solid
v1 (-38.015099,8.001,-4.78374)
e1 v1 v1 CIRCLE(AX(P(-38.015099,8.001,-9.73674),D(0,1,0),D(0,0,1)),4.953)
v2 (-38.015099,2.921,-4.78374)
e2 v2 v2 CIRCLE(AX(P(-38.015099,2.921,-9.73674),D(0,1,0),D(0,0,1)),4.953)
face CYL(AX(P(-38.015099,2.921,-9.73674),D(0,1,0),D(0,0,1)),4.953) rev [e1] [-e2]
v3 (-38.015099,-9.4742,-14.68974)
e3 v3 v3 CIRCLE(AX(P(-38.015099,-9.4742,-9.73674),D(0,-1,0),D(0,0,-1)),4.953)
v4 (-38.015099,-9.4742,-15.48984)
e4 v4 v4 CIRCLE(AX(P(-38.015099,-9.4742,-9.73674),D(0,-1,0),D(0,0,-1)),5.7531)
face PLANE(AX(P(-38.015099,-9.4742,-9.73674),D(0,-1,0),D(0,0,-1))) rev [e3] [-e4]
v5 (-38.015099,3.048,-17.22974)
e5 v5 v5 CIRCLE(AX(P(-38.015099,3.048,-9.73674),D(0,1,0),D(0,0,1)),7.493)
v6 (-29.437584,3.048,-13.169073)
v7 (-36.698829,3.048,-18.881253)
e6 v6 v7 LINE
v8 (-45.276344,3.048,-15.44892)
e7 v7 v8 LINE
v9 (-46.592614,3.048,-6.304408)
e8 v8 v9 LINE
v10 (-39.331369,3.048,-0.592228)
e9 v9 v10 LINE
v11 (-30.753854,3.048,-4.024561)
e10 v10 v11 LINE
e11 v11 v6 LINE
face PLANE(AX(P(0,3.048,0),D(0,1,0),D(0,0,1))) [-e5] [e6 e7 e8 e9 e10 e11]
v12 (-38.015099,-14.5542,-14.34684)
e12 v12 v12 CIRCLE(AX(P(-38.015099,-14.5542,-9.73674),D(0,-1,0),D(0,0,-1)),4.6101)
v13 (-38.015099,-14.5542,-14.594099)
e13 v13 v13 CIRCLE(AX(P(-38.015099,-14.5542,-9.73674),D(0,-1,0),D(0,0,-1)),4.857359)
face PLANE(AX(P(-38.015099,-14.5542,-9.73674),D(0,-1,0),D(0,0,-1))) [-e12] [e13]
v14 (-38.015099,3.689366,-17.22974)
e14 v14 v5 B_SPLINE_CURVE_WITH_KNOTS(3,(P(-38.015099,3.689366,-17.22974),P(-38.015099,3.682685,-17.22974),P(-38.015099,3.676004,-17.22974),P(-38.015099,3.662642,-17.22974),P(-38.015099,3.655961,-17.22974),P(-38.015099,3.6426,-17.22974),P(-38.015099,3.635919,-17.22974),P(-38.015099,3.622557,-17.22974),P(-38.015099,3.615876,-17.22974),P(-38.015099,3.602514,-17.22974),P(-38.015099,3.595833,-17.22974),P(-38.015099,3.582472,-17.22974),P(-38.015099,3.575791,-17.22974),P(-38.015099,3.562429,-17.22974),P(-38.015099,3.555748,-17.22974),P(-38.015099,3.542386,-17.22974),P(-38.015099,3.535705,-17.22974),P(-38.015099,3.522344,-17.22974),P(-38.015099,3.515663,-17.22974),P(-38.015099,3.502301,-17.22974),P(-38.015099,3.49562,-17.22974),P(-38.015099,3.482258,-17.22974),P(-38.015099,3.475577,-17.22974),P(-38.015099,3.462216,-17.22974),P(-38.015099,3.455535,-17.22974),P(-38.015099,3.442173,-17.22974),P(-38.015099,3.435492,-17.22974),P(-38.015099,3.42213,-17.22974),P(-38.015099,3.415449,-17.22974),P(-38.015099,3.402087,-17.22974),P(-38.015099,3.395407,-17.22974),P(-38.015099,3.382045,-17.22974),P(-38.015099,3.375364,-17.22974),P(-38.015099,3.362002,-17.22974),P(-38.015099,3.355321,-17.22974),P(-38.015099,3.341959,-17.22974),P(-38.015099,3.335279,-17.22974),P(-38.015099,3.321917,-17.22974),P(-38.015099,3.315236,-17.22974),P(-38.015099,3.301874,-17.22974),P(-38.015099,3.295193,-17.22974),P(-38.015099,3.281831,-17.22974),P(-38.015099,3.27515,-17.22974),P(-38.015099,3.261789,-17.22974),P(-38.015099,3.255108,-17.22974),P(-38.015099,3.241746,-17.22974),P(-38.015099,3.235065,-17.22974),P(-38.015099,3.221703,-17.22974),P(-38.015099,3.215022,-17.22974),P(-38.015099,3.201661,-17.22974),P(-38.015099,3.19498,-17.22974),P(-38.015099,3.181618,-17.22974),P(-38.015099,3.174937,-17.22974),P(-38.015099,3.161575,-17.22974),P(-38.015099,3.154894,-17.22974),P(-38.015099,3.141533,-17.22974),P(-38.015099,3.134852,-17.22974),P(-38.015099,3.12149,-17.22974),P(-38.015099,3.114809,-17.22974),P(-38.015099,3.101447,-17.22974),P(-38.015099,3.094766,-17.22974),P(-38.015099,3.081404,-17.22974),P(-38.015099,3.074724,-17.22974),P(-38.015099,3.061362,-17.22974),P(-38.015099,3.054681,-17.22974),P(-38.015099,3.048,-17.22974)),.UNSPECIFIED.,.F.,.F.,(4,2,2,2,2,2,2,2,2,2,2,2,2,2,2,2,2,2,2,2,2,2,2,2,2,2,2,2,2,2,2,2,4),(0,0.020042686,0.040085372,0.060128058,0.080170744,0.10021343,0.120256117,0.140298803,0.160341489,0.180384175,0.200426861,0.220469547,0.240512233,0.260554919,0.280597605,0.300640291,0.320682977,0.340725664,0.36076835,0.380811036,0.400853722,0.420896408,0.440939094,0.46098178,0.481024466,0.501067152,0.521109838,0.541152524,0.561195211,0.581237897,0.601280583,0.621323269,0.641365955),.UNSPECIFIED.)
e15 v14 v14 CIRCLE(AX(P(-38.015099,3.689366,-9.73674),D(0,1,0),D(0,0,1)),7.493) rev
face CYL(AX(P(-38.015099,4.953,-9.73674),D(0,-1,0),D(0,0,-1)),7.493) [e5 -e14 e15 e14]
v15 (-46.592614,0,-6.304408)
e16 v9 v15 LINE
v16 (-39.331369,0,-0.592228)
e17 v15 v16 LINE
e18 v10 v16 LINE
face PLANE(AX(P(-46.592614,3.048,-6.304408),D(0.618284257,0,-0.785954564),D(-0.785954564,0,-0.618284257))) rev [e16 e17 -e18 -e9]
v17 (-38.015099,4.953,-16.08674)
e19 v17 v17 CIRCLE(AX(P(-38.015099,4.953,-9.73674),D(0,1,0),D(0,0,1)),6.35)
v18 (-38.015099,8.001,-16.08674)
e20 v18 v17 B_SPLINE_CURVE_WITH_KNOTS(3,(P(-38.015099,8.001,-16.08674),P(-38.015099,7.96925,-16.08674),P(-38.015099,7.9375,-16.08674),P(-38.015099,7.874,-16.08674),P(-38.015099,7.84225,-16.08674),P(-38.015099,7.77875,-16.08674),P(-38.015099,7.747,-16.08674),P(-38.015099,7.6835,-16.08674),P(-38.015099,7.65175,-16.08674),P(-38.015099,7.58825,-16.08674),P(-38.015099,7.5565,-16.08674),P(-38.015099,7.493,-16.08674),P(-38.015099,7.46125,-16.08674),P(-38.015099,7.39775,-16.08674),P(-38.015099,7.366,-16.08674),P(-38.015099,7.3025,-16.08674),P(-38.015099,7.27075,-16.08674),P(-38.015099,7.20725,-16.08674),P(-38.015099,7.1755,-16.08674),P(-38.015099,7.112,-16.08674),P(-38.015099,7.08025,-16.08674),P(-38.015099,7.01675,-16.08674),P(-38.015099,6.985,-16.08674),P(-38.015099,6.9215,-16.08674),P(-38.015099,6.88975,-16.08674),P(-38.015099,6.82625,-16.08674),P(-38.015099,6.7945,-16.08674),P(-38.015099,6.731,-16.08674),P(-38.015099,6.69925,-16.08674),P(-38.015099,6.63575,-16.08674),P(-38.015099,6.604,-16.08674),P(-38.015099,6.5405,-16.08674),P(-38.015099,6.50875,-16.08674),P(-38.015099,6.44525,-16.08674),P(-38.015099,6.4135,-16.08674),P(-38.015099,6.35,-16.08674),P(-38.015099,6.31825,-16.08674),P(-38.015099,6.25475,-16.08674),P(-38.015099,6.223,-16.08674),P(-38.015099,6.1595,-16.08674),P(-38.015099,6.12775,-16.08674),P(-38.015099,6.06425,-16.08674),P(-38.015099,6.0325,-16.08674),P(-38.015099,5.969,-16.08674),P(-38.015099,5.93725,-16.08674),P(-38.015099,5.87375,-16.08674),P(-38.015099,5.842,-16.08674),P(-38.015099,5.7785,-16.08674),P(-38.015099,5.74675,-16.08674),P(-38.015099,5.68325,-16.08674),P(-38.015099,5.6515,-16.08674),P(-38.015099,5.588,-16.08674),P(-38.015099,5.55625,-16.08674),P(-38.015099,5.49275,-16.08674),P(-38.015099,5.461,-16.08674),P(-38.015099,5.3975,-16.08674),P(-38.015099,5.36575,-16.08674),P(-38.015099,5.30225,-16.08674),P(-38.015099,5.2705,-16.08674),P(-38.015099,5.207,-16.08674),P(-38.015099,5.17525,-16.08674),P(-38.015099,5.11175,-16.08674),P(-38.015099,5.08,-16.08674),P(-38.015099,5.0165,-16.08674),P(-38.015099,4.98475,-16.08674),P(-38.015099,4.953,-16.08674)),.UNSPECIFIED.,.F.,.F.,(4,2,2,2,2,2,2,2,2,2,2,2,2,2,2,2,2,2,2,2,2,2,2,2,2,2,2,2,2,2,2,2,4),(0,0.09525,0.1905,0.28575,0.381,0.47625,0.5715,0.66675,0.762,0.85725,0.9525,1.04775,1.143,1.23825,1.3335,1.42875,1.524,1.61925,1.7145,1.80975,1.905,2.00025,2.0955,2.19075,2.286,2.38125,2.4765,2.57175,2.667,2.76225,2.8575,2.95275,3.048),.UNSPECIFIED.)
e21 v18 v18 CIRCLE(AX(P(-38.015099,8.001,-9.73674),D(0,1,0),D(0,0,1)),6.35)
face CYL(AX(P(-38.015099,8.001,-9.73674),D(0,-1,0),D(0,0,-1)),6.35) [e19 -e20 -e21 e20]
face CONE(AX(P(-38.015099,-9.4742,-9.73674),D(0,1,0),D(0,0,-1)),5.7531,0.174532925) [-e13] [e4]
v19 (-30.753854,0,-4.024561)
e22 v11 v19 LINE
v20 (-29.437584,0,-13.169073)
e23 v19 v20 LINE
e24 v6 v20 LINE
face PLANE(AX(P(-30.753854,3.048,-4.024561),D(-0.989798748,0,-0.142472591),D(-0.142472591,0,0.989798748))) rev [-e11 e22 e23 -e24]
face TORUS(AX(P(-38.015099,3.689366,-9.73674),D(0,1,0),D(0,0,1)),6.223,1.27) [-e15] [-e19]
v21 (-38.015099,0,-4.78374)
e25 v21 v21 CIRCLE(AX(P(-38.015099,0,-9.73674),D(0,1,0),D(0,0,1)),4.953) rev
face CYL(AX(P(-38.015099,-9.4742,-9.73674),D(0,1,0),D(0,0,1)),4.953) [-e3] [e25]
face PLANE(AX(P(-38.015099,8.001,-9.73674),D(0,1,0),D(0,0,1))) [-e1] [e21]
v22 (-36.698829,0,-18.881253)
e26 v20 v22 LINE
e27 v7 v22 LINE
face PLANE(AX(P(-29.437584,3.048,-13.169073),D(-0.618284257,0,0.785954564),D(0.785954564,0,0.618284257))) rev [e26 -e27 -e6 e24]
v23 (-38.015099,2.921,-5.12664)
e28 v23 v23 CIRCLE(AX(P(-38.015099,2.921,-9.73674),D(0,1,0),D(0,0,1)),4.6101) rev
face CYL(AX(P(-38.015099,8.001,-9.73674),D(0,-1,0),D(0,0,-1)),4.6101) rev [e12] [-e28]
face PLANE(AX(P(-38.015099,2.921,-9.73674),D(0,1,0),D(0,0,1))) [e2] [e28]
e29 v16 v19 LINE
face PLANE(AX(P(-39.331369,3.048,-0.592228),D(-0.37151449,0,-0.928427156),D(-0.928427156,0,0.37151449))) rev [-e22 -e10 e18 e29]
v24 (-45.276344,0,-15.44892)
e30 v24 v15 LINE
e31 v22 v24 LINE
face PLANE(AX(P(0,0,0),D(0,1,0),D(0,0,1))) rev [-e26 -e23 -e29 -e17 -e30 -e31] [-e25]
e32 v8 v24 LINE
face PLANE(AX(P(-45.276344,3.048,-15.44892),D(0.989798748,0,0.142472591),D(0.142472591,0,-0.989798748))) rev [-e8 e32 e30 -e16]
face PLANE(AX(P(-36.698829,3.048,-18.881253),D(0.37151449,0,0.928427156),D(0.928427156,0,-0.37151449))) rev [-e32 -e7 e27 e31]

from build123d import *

# Parameters (mm, degrees)
BOSS_EXTRUDE1_DEPTH = 3.048
SKETCH2_R           = 7.493
BOSS_EXTRUDE2_DEPTH = 1.905
SKETCH3_R           = 6.35
BOSS_EXTRUDE3_DEPTH = 3.048
SKETCH5_R           = 4.953
BOSS_EXTRUDE4_DEPTH = 9.4742
SKETCH6_R           = 5.7531
BOSS_EXTRUDE5_DEPTH = 5.08
BOSS_EXTRUDE5_TAPER = 10
FILLET3_R           = 1.27
SKETCH9_R           = 4.6101
CUT_EXTRUDE2_DEPTH  = 56.100911289
SKETCH10_R          = 4.953
CUT_EXTRUDE3_DEPTH  = 5.08


with BuildPart() as part:
    # Sketch1 → Boss-Extrude1 (new body)
    with BuildSketch(Plane(origin=(0, 0, 0), x_dir=(1, 0, 0), z_dir=(0, 1, 0))):
        Polygon((-30.753854436, 4.024561232), (-29.437584499, 13.169073327), (-36.69882931, 18.881252578), (-45.276344058, 15.448919735), (-46.592613995, 6.30440764), (-39.331369184, 0.592228389), align=None)
    extrude(amount=BOSS_EXTRUDE1_DEPTH)

    # Sketch2 → Boss-Extrude2 (add)
    with BuildSketch(Plane(origin=(0, 3.048, 0), x_dir=(1, 0, 0), z_dir=(0, 1, 0))):
        with Locations(Location((-38.015099247, 9.736740484, 0), (0, 0, 90))):
            Circle(SKETCH2_R)
    extrude(amount=BOSS_EXTRUDE2_DEPTH)

    # Sketch3 → Boss-Extrude3 (add)
    with BuildSketch(Plane(origin=(0, 4.953, 0), x_dir=(1, 0, 0), z_dir=(0, 1, 0))):
        with Locations(Location((-38.015099247, 9.736740484, 0), (0, 0, 90))):
            Circle(SKETCH3_R)
    extrude(amount=BOSS_EXTRUDE3_DEPTH)

    # Sketch5 → Boss-Extrude4 (add)
    with BuildSketch(Plane.XZ):
        with Locations(Location((-38.015099247, -9.736740484, 0), (0, 0, 90))):
            Circle(SKETCH5_R)
    extrude(amount=BOSS_EXTRUDE4_DEPTH)

    # Sketch6 → Boss-Extrude5 (add)
    with BuildSketch(Plane.XZ.offset(9.4742)):
        with Locations((-38.015099247, -9.736740484)):
            Circle(SKETCH6_R)
    extrude(amount=BOSS_EXTRUDE5_DEPTH, taper=BOSS_EXTRUDE5_TAPER)

    # Fillet3
    # the kernel refuses this fillet: 1.27 mm, written as the material it takes off along each edge
    with BuildSketch(Plane(origin=(-38.015099247, 4.953, -9.736740484), x_dir=(0, 0, -1), z_dir=(1, 0, 0))) as fillet3_piece_1:
        with BuildLine():
            CenterArc((6.223, -1.263634045), FILLET3_R, 0, 84.260829523)
            Line((6.35, 0), (6.35254, 0.025272681))
            ThreePointArc((6.35254, 0.025272681), (6.9215, 0.0254), (7.493, 0.0254))
            Line((7.493, 0.0254), (7.5184, 0))
            Line((7.5184, 0), (7.5184, -1.263634045))
            Line((7.5184, -1.263634045), (7.493, -1.263634045))
        make_face()
    revolve(axis=Axis((-38.015099247, 4.953, -9.736740484), (0, 1, 0)), mode=Mode.SUBTRACT)

    # Sketch9 → Cut-Extrude2 (cut, through all)
    with BuildSketch(Plane.XZ.offset(14.5542)):
        with Locations(Location((-38.015099247, -9.736740484, 0), (0, 0, 270))):
            Circle(SKETCH9_R)
    extrude(amount=-CUT_EXTRUDE2_DEPTH, mode=Mode.SUBTRACT)

    # Sketch10 → Cut-Extrude3 (cut)
    with BuildSketch(Plane(origin=(0, 8.001, 0), x_dir=(1, 0, 0), z_dir=(0, 1, 0))):
        with Locations(Location((-38.015099247, 9.736740484, 0), (0, 0, 270))):
            Circle(SKETCH10_R)
    extrude(amount=-CUT_EXTRUDE3_DEPTH, mode=Mode.SUBTRACT)


solid = part.part
